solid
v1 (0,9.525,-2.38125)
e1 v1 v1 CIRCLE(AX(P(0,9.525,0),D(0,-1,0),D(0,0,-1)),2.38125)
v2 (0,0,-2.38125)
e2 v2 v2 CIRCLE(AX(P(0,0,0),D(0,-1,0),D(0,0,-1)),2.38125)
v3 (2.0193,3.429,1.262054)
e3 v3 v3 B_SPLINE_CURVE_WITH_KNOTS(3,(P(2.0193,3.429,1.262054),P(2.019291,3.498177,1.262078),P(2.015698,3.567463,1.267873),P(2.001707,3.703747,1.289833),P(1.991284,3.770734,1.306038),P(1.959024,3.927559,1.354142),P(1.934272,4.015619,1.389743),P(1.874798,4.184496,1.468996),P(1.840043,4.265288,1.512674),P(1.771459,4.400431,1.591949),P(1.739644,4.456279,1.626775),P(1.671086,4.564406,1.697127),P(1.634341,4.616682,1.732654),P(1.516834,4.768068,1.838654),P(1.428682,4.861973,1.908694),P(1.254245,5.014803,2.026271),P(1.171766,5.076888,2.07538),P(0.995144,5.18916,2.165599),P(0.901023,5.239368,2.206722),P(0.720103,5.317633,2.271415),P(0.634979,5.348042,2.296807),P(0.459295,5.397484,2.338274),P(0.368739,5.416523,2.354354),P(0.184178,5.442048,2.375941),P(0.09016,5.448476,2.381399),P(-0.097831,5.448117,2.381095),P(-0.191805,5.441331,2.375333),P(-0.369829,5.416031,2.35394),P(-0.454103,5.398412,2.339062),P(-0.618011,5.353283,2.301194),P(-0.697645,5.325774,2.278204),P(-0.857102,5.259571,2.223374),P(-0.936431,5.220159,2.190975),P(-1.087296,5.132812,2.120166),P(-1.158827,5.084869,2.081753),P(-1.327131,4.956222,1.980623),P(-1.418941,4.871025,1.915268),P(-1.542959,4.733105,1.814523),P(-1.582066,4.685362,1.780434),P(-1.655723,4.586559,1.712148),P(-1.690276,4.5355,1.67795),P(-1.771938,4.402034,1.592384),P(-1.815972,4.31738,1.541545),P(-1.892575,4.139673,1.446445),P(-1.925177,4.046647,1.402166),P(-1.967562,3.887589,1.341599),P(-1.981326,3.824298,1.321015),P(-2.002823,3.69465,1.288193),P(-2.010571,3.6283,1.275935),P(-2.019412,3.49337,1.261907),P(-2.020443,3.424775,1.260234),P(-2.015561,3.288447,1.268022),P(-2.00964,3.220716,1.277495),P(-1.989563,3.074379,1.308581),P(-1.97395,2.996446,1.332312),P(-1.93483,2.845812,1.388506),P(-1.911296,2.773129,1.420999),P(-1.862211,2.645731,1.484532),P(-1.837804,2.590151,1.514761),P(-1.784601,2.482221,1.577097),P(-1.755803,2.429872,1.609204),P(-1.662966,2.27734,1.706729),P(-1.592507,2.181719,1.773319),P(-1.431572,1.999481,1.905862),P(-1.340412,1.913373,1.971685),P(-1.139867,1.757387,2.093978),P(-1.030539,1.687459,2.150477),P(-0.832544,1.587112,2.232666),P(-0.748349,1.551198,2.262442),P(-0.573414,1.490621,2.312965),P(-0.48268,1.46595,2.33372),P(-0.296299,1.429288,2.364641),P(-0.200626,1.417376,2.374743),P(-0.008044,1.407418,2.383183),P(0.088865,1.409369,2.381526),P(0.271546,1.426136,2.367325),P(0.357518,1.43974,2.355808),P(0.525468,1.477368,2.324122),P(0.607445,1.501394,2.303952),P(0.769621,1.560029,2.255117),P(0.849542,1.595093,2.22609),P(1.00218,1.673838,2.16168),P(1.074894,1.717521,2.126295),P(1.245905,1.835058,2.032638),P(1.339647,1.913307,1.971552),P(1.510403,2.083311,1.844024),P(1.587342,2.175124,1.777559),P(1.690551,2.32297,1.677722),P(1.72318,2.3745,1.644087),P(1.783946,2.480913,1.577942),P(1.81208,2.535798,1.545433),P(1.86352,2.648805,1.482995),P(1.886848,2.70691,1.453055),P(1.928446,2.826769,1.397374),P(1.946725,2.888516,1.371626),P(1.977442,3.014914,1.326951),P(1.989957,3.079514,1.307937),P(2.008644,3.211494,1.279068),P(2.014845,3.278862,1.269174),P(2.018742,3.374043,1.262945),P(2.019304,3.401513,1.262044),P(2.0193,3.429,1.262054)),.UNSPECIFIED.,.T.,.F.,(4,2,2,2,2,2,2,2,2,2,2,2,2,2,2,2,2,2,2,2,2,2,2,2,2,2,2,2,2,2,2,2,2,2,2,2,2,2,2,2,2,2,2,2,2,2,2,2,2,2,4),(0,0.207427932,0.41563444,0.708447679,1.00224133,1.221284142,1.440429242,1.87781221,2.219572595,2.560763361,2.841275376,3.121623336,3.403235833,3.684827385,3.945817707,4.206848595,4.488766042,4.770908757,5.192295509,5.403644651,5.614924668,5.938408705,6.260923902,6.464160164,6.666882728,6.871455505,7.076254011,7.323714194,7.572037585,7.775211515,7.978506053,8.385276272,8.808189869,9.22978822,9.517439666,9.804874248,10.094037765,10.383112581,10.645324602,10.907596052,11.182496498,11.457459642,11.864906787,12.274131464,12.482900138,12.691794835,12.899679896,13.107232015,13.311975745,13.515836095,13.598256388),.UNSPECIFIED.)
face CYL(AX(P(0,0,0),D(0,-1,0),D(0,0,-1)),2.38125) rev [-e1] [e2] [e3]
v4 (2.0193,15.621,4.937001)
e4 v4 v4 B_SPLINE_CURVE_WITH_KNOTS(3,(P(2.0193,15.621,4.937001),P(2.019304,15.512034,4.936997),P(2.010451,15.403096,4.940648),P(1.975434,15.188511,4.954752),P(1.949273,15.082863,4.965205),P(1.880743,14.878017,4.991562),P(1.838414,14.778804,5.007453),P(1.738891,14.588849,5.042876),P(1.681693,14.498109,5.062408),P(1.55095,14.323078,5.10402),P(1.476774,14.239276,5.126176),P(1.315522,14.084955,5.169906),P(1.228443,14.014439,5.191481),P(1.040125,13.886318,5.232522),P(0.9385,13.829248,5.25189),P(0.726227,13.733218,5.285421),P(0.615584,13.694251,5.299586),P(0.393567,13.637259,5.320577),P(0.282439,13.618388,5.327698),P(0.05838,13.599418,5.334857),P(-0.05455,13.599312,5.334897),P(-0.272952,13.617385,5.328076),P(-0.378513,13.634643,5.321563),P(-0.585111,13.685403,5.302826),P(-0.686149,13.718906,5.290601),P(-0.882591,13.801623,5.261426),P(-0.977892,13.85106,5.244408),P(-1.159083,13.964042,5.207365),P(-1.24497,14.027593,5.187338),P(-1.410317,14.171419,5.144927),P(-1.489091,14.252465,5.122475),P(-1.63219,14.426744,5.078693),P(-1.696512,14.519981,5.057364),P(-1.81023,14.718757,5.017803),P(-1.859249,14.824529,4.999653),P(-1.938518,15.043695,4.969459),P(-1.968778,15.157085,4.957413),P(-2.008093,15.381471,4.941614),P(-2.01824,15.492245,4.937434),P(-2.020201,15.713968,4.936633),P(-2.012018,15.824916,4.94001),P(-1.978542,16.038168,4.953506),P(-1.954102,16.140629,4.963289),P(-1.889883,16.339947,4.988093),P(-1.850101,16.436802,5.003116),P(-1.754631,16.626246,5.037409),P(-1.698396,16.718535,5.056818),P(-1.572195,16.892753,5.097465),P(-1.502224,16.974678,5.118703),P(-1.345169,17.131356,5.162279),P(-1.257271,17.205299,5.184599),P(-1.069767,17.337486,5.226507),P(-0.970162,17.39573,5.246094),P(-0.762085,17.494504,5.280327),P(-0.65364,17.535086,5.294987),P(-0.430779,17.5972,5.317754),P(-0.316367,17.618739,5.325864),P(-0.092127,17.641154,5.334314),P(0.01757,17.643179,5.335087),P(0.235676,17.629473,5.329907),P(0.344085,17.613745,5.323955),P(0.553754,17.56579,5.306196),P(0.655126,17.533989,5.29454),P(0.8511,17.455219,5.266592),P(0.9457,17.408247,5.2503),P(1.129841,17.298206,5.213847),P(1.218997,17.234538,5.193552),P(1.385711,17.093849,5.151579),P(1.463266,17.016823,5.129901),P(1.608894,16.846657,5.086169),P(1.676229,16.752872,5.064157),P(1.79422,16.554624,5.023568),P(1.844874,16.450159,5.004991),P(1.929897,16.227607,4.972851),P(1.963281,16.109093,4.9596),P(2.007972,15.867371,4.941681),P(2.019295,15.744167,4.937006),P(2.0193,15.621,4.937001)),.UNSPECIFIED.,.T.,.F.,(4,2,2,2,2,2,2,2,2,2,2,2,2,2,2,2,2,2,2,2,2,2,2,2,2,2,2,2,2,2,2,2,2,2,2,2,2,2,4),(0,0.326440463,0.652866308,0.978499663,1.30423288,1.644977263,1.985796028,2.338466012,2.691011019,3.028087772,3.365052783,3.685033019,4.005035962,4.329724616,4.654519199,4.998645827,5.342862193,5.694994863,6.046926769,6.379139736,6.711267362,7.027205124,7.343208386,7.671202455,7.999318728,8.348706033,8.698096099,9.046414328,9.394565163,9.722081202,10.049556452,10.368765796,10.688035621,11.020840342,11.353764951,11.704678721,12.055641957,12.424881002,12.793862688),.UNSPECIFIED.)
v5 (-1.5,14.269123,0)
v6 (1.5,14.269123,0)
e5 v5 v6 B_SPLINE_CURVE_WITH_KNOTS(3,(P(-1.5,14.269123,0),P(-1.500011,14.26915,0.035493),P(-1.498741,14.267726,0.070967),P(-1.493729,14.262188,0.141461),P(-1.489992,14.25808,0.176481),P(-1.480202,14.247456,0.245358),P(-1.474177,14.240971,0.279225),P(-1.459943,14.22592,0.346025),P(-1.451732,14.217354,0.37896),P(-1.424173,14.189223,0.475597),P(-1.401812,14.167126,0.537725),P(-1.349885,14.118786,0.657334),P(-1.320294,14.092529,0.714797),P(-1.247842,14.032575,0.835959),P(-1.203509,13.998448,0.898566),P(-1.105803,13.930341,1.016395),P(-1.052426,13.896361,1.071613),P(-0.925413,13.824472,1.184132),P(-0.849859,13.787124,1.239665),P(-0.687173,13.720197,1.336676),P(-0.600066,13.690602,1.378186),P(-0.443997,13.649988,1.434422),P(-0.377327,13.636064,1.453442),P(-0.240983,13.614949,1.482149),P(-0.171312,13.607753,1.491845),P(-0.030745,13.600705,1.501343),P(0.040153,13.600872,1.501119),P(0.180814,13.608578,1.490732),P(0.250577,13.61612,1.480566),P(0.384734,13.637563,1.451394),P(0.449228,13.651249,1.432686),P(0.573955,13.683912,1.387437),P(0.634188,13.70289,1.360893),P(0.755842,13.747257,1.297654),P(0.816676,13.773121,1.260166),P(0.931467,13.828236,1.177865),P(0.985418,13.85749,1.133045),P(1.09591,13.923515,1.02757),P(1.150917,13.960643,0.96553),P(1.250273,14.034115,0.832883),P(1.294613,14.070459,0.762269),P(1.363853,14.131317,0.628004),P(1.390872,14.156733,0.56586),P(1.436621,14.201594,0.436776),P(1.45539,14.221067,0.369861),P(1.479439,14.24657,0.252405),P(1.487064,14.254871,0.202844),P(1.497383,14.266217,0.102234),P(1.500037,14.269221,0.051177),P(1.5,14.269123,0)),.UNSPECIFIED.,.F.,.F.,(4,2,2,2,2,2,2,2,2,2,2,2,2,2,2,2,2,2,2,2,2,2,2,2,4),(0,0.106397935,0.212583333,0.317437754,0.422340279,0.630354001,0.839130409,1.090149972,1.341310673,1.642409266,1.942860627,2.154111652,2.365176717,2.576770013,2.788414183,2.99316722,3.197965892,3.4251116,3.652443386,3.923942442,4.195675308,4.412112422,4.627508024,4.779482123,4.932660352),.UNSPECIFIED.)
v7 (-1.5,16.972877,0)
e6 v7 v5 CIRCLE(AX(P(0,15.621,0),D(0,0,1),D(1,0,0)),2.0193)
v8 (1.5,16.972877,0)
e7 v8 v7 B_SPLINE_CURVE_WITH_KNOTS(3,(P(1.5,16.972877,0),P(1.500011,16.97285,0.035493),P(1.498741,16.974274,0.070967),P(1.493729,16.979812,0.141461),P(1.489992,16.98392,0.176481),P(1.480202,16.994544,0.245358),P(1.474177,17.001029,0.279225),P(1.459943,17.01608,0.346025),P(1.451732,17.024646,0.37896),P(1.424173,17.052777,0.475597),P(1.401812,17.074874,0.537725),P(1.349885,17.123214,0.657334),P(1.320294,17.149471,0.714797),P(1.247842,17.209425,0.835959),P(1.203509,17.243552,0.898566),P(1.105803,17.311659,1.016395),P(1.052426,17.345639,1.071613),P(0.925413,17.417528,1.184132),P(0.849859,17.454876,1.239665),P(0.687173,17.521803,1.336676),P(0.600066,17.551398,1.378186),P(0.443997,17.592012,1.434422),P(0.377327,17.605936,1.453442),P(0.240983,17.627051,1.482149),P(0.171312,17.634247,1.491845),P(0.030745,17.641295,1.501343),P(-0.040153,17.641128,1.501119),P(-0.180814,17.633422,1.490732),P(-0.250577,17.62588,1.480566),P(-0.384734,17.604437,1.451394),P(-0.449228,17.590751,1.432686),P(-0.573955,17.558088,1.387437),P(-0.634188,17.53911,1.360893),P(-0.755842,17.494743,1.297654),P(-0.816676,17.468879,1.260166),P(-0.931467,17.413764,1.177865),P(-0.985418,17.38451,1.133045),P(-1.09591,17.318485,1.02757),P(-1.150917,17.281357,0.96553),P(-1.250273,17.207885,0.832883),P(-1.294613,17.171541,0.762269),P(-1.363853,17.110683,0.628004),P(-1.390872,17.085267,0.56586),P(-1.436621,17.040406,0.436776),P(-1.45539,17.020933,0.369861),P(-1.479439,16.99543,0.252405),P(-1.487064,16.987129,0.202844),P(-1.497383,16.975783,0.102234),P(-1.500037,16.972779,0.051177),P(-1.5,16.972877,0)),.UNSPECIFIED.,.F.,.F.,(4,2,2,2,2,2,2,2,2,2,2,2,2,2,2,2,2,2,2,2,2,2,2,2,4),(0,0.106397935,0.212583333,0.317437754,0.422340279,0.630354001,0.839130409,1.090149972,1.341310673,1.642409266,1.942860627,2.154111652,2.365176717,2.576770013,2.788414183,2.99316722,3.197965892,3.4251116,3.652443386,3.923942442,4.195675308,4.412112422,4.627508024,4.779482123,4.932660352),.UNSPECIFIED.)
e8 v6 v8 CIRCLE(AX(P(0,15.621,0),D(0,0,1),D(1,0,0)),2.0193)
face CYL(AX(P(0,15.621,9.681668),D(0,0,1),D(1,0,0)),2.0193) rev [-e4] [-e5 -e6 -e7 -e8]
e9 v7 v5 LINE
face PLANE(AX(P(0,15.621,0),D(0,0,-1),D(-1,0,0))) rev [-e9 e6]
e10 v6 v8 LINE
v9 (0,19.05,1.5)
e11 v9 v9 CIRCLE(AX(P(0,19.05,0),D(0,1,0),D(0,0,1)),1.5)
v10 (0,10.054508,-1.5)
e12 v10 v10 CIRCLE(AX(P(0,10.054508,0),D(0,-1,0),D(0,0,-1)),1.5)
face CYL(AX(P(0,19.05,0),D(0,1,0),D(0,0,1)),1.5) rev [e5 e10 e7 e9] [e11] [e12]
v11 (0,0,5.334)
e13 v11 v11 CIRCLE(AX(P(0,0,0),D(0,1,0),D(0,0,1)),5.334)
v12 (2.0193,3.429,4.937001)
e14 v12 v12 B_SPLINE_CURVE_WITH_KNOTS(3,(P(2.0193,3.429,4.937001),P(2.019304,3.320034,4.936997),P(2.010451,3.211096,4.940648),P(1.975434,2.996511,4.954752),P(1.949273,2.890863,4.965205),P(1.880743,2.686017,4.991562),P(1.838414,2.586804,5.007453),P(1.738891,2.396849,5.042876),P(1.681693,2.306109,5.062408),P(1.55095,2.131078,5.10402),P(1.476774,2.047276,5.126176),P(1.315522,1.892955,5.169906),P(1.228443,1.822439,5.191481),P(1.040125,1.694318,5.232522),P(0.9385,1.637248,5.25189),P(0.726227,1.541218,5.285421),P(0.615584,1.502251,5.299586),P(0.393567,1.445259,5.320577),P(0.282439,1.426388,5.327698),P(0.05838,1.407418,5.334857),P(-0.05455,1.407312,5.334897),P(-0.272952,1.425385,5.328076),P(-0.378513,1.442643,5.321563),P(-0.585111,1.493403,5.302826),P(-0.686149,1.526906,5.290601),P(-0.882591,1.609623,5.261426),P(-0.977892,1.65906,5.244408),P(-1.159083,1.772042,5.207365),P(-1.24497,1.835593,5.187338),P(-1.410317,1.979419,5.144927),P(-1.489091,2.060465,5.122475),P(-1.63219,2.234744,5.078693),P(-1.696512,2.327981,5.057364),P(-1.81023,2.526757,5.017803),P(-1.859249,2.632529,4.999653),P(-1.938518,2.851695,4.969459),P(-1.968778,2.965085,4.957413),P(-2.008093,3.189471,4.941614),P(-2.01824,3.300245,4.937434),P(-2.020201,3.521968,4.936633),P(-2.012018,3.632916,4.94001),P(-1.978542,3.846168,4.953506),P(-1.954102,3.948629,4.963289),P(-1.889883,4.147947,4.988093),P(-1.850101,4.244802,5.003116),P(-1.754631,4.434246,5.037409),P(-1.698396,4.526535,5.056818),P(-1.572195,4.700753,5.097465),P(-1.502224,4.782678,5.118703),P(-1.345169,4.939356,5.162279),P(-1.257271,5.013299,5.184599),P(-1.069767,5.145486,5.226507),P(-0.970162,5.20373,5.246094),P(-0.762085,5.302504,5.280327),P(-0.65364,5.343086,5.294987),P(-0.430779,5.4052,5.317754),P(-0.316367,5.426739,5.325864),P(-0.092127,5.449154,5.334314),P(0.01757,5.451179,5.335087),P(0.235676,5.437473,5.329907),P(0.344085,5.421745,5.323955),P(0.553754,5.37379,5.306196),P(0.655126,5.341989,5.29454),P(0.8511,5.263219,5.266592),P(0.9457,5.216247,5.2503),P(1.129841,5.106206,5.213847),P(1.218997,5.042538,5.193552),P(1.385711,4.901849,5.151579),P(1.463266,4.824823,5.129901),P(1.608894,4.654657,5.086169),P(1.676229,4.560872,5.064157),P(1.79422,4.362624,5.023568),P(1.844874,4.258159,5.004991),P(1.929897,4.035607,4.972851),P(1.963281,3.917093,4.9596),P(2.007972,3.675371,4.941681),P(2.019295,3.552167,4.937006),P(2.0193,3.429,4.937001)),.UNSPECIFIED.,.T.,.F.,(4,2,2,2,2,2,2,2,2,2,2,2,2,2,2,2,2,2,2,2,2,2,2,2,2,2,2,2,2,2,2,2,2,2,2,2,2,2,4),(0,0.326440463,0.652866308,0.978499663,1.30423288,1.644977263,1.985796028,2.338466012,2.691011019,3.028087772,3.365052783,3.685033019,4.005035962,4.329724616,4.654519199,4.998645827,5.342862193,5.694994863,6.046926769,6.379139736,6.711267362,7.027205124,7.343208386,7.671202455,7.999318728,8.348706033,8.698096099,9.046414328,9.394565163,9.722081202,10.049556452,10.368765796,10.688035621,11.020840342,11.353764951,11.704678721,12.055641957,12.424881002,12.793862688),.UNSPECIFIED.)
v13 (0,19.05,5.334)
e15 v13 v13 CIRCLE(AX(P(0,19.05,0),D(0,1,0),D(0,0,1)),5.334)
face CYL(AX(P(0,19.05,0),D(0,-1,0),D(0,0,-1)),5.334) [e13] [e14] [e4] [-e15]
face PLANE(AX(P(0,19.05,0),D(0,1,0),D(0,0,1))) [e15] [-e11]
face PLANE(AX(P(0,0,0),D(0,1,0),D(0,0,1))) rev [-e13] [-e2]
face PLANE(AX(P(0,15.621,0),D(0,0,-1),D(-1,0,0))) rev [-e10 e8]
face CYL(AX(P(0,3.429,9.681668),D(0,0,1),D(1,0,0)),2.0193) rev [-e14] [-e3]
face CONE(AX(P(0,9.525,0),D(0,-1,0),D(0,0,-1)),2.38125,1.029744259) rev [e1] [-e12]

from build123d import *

# Parameters (mm, degrees)
SKETCH1_R                       = 5.334
BOSS_EXTRUDE1_DEPTH             = 19.05
F_3_0MM_DOWEL_HOLE3_D           = 3
F_3_0MM_DOWEL_HOLE3_DEPTH       = 9.525
F_3_0MM_DOWEL_HOLE3_TIP         = 0.901290929
F_3_16_0_1875_DOWEL_HOLE1_D     = 4.7625
F_3_16_0_1875_DOWEL_HOLE1_DEPTH = 9.525
F_3_16_0_1875_DOWEL_HOLE1_TIP   = 1.430799349
F_10_32_TAPPED_HOLE1_OUTLINE_R  = 2.0193
F_10_32_TAPPED_HOLE1_DEPTH      = 6


with BuildPart() as part:
    # Sketch1 → Boss-Extrude1 (new body)
    with BuildSketch(Plane(origin=(0, 0, 0), x_dir=(1, 0, 0), z_dir=(0, 1, 0))):
        with Locations(Location((0, 0, 0), (0, 0, 90))):
            Circle(SKETCH1_R)
    extrude(amount=BOSS_EXTRUDE1_DEPTH)

    # Ø3.0mm Dowel Hole3
    with Locations(Plane(origin=(0, 19.05, 0), x_dir=(1, 0, 0), z_dir=(0, 1, 0))):
        with Locations((0, 0)):
            Hole(F_3_0MM_DOWEL_HOLE3_D / 2, depth=F_3_0MM_DOWEL_HOLE3_DEPTH)
            with Locations((0, 0, -(F_3_0MM_DOWEL_HOLE3_DEPTH + F_3_0MM_DOWEL_HOLE3_TIP / 2))):  # 118° drill point
                Cone(0, F_3_0MM_DOWEL_HOLE3_D / 2, F_3_0MM_DOWEL_HOLE3_TIP, mode=Mode.SUBTRACT)

    # 3/16 (0.1875) Dowel Hole1
    with Locations(Plane(origin=(0, 0, 0), x_dir=(-1, 0, 0), z_dir=(0, -1, 0))):
        with Locations((0, 0)):
            Hole(F_3_16_0_1875_DOWEL_HOLE1_D / 2, depth=F_3_16_0_1875_DOWEL_HOLE1_DEPTH)
            with Locations((0, 0, -(F_3_16_0_1875_DOWEL_HOLE1_DEPTH + F_3_16_0_1875_DOWEL_HOLE1_TIP / 2))):  # 118° drill point
                Cone(0, F_3_16_0_1875_DOWEL_HOLE1_D / 2, F_3_16_0_1875_DOWEL_HOLE1_TIP, mode=Mode.SUBTRACT)

    # #10-32 Tapped Hole1: read off the stored shape, not the designer's step
    # #10-32 Tapped Hole1 outline → #10-32 Tapped Hole1 (cut)
    with BuildSketch(Plane.XY):
        with Locations((0, 3.429)):
            Circle(F_10_32_TAPPED_HOLE1_OUTLINE_R)
        with Locations((0, 15.621)):
            Circle(F_10_32_TAPPED_HOLE1_OUTLINE_R)
    extrude(amount=F_10_32_TAPPED_HOLE1_DEPTH, mode=Mode.SUBTRACT)


solid = part.part
